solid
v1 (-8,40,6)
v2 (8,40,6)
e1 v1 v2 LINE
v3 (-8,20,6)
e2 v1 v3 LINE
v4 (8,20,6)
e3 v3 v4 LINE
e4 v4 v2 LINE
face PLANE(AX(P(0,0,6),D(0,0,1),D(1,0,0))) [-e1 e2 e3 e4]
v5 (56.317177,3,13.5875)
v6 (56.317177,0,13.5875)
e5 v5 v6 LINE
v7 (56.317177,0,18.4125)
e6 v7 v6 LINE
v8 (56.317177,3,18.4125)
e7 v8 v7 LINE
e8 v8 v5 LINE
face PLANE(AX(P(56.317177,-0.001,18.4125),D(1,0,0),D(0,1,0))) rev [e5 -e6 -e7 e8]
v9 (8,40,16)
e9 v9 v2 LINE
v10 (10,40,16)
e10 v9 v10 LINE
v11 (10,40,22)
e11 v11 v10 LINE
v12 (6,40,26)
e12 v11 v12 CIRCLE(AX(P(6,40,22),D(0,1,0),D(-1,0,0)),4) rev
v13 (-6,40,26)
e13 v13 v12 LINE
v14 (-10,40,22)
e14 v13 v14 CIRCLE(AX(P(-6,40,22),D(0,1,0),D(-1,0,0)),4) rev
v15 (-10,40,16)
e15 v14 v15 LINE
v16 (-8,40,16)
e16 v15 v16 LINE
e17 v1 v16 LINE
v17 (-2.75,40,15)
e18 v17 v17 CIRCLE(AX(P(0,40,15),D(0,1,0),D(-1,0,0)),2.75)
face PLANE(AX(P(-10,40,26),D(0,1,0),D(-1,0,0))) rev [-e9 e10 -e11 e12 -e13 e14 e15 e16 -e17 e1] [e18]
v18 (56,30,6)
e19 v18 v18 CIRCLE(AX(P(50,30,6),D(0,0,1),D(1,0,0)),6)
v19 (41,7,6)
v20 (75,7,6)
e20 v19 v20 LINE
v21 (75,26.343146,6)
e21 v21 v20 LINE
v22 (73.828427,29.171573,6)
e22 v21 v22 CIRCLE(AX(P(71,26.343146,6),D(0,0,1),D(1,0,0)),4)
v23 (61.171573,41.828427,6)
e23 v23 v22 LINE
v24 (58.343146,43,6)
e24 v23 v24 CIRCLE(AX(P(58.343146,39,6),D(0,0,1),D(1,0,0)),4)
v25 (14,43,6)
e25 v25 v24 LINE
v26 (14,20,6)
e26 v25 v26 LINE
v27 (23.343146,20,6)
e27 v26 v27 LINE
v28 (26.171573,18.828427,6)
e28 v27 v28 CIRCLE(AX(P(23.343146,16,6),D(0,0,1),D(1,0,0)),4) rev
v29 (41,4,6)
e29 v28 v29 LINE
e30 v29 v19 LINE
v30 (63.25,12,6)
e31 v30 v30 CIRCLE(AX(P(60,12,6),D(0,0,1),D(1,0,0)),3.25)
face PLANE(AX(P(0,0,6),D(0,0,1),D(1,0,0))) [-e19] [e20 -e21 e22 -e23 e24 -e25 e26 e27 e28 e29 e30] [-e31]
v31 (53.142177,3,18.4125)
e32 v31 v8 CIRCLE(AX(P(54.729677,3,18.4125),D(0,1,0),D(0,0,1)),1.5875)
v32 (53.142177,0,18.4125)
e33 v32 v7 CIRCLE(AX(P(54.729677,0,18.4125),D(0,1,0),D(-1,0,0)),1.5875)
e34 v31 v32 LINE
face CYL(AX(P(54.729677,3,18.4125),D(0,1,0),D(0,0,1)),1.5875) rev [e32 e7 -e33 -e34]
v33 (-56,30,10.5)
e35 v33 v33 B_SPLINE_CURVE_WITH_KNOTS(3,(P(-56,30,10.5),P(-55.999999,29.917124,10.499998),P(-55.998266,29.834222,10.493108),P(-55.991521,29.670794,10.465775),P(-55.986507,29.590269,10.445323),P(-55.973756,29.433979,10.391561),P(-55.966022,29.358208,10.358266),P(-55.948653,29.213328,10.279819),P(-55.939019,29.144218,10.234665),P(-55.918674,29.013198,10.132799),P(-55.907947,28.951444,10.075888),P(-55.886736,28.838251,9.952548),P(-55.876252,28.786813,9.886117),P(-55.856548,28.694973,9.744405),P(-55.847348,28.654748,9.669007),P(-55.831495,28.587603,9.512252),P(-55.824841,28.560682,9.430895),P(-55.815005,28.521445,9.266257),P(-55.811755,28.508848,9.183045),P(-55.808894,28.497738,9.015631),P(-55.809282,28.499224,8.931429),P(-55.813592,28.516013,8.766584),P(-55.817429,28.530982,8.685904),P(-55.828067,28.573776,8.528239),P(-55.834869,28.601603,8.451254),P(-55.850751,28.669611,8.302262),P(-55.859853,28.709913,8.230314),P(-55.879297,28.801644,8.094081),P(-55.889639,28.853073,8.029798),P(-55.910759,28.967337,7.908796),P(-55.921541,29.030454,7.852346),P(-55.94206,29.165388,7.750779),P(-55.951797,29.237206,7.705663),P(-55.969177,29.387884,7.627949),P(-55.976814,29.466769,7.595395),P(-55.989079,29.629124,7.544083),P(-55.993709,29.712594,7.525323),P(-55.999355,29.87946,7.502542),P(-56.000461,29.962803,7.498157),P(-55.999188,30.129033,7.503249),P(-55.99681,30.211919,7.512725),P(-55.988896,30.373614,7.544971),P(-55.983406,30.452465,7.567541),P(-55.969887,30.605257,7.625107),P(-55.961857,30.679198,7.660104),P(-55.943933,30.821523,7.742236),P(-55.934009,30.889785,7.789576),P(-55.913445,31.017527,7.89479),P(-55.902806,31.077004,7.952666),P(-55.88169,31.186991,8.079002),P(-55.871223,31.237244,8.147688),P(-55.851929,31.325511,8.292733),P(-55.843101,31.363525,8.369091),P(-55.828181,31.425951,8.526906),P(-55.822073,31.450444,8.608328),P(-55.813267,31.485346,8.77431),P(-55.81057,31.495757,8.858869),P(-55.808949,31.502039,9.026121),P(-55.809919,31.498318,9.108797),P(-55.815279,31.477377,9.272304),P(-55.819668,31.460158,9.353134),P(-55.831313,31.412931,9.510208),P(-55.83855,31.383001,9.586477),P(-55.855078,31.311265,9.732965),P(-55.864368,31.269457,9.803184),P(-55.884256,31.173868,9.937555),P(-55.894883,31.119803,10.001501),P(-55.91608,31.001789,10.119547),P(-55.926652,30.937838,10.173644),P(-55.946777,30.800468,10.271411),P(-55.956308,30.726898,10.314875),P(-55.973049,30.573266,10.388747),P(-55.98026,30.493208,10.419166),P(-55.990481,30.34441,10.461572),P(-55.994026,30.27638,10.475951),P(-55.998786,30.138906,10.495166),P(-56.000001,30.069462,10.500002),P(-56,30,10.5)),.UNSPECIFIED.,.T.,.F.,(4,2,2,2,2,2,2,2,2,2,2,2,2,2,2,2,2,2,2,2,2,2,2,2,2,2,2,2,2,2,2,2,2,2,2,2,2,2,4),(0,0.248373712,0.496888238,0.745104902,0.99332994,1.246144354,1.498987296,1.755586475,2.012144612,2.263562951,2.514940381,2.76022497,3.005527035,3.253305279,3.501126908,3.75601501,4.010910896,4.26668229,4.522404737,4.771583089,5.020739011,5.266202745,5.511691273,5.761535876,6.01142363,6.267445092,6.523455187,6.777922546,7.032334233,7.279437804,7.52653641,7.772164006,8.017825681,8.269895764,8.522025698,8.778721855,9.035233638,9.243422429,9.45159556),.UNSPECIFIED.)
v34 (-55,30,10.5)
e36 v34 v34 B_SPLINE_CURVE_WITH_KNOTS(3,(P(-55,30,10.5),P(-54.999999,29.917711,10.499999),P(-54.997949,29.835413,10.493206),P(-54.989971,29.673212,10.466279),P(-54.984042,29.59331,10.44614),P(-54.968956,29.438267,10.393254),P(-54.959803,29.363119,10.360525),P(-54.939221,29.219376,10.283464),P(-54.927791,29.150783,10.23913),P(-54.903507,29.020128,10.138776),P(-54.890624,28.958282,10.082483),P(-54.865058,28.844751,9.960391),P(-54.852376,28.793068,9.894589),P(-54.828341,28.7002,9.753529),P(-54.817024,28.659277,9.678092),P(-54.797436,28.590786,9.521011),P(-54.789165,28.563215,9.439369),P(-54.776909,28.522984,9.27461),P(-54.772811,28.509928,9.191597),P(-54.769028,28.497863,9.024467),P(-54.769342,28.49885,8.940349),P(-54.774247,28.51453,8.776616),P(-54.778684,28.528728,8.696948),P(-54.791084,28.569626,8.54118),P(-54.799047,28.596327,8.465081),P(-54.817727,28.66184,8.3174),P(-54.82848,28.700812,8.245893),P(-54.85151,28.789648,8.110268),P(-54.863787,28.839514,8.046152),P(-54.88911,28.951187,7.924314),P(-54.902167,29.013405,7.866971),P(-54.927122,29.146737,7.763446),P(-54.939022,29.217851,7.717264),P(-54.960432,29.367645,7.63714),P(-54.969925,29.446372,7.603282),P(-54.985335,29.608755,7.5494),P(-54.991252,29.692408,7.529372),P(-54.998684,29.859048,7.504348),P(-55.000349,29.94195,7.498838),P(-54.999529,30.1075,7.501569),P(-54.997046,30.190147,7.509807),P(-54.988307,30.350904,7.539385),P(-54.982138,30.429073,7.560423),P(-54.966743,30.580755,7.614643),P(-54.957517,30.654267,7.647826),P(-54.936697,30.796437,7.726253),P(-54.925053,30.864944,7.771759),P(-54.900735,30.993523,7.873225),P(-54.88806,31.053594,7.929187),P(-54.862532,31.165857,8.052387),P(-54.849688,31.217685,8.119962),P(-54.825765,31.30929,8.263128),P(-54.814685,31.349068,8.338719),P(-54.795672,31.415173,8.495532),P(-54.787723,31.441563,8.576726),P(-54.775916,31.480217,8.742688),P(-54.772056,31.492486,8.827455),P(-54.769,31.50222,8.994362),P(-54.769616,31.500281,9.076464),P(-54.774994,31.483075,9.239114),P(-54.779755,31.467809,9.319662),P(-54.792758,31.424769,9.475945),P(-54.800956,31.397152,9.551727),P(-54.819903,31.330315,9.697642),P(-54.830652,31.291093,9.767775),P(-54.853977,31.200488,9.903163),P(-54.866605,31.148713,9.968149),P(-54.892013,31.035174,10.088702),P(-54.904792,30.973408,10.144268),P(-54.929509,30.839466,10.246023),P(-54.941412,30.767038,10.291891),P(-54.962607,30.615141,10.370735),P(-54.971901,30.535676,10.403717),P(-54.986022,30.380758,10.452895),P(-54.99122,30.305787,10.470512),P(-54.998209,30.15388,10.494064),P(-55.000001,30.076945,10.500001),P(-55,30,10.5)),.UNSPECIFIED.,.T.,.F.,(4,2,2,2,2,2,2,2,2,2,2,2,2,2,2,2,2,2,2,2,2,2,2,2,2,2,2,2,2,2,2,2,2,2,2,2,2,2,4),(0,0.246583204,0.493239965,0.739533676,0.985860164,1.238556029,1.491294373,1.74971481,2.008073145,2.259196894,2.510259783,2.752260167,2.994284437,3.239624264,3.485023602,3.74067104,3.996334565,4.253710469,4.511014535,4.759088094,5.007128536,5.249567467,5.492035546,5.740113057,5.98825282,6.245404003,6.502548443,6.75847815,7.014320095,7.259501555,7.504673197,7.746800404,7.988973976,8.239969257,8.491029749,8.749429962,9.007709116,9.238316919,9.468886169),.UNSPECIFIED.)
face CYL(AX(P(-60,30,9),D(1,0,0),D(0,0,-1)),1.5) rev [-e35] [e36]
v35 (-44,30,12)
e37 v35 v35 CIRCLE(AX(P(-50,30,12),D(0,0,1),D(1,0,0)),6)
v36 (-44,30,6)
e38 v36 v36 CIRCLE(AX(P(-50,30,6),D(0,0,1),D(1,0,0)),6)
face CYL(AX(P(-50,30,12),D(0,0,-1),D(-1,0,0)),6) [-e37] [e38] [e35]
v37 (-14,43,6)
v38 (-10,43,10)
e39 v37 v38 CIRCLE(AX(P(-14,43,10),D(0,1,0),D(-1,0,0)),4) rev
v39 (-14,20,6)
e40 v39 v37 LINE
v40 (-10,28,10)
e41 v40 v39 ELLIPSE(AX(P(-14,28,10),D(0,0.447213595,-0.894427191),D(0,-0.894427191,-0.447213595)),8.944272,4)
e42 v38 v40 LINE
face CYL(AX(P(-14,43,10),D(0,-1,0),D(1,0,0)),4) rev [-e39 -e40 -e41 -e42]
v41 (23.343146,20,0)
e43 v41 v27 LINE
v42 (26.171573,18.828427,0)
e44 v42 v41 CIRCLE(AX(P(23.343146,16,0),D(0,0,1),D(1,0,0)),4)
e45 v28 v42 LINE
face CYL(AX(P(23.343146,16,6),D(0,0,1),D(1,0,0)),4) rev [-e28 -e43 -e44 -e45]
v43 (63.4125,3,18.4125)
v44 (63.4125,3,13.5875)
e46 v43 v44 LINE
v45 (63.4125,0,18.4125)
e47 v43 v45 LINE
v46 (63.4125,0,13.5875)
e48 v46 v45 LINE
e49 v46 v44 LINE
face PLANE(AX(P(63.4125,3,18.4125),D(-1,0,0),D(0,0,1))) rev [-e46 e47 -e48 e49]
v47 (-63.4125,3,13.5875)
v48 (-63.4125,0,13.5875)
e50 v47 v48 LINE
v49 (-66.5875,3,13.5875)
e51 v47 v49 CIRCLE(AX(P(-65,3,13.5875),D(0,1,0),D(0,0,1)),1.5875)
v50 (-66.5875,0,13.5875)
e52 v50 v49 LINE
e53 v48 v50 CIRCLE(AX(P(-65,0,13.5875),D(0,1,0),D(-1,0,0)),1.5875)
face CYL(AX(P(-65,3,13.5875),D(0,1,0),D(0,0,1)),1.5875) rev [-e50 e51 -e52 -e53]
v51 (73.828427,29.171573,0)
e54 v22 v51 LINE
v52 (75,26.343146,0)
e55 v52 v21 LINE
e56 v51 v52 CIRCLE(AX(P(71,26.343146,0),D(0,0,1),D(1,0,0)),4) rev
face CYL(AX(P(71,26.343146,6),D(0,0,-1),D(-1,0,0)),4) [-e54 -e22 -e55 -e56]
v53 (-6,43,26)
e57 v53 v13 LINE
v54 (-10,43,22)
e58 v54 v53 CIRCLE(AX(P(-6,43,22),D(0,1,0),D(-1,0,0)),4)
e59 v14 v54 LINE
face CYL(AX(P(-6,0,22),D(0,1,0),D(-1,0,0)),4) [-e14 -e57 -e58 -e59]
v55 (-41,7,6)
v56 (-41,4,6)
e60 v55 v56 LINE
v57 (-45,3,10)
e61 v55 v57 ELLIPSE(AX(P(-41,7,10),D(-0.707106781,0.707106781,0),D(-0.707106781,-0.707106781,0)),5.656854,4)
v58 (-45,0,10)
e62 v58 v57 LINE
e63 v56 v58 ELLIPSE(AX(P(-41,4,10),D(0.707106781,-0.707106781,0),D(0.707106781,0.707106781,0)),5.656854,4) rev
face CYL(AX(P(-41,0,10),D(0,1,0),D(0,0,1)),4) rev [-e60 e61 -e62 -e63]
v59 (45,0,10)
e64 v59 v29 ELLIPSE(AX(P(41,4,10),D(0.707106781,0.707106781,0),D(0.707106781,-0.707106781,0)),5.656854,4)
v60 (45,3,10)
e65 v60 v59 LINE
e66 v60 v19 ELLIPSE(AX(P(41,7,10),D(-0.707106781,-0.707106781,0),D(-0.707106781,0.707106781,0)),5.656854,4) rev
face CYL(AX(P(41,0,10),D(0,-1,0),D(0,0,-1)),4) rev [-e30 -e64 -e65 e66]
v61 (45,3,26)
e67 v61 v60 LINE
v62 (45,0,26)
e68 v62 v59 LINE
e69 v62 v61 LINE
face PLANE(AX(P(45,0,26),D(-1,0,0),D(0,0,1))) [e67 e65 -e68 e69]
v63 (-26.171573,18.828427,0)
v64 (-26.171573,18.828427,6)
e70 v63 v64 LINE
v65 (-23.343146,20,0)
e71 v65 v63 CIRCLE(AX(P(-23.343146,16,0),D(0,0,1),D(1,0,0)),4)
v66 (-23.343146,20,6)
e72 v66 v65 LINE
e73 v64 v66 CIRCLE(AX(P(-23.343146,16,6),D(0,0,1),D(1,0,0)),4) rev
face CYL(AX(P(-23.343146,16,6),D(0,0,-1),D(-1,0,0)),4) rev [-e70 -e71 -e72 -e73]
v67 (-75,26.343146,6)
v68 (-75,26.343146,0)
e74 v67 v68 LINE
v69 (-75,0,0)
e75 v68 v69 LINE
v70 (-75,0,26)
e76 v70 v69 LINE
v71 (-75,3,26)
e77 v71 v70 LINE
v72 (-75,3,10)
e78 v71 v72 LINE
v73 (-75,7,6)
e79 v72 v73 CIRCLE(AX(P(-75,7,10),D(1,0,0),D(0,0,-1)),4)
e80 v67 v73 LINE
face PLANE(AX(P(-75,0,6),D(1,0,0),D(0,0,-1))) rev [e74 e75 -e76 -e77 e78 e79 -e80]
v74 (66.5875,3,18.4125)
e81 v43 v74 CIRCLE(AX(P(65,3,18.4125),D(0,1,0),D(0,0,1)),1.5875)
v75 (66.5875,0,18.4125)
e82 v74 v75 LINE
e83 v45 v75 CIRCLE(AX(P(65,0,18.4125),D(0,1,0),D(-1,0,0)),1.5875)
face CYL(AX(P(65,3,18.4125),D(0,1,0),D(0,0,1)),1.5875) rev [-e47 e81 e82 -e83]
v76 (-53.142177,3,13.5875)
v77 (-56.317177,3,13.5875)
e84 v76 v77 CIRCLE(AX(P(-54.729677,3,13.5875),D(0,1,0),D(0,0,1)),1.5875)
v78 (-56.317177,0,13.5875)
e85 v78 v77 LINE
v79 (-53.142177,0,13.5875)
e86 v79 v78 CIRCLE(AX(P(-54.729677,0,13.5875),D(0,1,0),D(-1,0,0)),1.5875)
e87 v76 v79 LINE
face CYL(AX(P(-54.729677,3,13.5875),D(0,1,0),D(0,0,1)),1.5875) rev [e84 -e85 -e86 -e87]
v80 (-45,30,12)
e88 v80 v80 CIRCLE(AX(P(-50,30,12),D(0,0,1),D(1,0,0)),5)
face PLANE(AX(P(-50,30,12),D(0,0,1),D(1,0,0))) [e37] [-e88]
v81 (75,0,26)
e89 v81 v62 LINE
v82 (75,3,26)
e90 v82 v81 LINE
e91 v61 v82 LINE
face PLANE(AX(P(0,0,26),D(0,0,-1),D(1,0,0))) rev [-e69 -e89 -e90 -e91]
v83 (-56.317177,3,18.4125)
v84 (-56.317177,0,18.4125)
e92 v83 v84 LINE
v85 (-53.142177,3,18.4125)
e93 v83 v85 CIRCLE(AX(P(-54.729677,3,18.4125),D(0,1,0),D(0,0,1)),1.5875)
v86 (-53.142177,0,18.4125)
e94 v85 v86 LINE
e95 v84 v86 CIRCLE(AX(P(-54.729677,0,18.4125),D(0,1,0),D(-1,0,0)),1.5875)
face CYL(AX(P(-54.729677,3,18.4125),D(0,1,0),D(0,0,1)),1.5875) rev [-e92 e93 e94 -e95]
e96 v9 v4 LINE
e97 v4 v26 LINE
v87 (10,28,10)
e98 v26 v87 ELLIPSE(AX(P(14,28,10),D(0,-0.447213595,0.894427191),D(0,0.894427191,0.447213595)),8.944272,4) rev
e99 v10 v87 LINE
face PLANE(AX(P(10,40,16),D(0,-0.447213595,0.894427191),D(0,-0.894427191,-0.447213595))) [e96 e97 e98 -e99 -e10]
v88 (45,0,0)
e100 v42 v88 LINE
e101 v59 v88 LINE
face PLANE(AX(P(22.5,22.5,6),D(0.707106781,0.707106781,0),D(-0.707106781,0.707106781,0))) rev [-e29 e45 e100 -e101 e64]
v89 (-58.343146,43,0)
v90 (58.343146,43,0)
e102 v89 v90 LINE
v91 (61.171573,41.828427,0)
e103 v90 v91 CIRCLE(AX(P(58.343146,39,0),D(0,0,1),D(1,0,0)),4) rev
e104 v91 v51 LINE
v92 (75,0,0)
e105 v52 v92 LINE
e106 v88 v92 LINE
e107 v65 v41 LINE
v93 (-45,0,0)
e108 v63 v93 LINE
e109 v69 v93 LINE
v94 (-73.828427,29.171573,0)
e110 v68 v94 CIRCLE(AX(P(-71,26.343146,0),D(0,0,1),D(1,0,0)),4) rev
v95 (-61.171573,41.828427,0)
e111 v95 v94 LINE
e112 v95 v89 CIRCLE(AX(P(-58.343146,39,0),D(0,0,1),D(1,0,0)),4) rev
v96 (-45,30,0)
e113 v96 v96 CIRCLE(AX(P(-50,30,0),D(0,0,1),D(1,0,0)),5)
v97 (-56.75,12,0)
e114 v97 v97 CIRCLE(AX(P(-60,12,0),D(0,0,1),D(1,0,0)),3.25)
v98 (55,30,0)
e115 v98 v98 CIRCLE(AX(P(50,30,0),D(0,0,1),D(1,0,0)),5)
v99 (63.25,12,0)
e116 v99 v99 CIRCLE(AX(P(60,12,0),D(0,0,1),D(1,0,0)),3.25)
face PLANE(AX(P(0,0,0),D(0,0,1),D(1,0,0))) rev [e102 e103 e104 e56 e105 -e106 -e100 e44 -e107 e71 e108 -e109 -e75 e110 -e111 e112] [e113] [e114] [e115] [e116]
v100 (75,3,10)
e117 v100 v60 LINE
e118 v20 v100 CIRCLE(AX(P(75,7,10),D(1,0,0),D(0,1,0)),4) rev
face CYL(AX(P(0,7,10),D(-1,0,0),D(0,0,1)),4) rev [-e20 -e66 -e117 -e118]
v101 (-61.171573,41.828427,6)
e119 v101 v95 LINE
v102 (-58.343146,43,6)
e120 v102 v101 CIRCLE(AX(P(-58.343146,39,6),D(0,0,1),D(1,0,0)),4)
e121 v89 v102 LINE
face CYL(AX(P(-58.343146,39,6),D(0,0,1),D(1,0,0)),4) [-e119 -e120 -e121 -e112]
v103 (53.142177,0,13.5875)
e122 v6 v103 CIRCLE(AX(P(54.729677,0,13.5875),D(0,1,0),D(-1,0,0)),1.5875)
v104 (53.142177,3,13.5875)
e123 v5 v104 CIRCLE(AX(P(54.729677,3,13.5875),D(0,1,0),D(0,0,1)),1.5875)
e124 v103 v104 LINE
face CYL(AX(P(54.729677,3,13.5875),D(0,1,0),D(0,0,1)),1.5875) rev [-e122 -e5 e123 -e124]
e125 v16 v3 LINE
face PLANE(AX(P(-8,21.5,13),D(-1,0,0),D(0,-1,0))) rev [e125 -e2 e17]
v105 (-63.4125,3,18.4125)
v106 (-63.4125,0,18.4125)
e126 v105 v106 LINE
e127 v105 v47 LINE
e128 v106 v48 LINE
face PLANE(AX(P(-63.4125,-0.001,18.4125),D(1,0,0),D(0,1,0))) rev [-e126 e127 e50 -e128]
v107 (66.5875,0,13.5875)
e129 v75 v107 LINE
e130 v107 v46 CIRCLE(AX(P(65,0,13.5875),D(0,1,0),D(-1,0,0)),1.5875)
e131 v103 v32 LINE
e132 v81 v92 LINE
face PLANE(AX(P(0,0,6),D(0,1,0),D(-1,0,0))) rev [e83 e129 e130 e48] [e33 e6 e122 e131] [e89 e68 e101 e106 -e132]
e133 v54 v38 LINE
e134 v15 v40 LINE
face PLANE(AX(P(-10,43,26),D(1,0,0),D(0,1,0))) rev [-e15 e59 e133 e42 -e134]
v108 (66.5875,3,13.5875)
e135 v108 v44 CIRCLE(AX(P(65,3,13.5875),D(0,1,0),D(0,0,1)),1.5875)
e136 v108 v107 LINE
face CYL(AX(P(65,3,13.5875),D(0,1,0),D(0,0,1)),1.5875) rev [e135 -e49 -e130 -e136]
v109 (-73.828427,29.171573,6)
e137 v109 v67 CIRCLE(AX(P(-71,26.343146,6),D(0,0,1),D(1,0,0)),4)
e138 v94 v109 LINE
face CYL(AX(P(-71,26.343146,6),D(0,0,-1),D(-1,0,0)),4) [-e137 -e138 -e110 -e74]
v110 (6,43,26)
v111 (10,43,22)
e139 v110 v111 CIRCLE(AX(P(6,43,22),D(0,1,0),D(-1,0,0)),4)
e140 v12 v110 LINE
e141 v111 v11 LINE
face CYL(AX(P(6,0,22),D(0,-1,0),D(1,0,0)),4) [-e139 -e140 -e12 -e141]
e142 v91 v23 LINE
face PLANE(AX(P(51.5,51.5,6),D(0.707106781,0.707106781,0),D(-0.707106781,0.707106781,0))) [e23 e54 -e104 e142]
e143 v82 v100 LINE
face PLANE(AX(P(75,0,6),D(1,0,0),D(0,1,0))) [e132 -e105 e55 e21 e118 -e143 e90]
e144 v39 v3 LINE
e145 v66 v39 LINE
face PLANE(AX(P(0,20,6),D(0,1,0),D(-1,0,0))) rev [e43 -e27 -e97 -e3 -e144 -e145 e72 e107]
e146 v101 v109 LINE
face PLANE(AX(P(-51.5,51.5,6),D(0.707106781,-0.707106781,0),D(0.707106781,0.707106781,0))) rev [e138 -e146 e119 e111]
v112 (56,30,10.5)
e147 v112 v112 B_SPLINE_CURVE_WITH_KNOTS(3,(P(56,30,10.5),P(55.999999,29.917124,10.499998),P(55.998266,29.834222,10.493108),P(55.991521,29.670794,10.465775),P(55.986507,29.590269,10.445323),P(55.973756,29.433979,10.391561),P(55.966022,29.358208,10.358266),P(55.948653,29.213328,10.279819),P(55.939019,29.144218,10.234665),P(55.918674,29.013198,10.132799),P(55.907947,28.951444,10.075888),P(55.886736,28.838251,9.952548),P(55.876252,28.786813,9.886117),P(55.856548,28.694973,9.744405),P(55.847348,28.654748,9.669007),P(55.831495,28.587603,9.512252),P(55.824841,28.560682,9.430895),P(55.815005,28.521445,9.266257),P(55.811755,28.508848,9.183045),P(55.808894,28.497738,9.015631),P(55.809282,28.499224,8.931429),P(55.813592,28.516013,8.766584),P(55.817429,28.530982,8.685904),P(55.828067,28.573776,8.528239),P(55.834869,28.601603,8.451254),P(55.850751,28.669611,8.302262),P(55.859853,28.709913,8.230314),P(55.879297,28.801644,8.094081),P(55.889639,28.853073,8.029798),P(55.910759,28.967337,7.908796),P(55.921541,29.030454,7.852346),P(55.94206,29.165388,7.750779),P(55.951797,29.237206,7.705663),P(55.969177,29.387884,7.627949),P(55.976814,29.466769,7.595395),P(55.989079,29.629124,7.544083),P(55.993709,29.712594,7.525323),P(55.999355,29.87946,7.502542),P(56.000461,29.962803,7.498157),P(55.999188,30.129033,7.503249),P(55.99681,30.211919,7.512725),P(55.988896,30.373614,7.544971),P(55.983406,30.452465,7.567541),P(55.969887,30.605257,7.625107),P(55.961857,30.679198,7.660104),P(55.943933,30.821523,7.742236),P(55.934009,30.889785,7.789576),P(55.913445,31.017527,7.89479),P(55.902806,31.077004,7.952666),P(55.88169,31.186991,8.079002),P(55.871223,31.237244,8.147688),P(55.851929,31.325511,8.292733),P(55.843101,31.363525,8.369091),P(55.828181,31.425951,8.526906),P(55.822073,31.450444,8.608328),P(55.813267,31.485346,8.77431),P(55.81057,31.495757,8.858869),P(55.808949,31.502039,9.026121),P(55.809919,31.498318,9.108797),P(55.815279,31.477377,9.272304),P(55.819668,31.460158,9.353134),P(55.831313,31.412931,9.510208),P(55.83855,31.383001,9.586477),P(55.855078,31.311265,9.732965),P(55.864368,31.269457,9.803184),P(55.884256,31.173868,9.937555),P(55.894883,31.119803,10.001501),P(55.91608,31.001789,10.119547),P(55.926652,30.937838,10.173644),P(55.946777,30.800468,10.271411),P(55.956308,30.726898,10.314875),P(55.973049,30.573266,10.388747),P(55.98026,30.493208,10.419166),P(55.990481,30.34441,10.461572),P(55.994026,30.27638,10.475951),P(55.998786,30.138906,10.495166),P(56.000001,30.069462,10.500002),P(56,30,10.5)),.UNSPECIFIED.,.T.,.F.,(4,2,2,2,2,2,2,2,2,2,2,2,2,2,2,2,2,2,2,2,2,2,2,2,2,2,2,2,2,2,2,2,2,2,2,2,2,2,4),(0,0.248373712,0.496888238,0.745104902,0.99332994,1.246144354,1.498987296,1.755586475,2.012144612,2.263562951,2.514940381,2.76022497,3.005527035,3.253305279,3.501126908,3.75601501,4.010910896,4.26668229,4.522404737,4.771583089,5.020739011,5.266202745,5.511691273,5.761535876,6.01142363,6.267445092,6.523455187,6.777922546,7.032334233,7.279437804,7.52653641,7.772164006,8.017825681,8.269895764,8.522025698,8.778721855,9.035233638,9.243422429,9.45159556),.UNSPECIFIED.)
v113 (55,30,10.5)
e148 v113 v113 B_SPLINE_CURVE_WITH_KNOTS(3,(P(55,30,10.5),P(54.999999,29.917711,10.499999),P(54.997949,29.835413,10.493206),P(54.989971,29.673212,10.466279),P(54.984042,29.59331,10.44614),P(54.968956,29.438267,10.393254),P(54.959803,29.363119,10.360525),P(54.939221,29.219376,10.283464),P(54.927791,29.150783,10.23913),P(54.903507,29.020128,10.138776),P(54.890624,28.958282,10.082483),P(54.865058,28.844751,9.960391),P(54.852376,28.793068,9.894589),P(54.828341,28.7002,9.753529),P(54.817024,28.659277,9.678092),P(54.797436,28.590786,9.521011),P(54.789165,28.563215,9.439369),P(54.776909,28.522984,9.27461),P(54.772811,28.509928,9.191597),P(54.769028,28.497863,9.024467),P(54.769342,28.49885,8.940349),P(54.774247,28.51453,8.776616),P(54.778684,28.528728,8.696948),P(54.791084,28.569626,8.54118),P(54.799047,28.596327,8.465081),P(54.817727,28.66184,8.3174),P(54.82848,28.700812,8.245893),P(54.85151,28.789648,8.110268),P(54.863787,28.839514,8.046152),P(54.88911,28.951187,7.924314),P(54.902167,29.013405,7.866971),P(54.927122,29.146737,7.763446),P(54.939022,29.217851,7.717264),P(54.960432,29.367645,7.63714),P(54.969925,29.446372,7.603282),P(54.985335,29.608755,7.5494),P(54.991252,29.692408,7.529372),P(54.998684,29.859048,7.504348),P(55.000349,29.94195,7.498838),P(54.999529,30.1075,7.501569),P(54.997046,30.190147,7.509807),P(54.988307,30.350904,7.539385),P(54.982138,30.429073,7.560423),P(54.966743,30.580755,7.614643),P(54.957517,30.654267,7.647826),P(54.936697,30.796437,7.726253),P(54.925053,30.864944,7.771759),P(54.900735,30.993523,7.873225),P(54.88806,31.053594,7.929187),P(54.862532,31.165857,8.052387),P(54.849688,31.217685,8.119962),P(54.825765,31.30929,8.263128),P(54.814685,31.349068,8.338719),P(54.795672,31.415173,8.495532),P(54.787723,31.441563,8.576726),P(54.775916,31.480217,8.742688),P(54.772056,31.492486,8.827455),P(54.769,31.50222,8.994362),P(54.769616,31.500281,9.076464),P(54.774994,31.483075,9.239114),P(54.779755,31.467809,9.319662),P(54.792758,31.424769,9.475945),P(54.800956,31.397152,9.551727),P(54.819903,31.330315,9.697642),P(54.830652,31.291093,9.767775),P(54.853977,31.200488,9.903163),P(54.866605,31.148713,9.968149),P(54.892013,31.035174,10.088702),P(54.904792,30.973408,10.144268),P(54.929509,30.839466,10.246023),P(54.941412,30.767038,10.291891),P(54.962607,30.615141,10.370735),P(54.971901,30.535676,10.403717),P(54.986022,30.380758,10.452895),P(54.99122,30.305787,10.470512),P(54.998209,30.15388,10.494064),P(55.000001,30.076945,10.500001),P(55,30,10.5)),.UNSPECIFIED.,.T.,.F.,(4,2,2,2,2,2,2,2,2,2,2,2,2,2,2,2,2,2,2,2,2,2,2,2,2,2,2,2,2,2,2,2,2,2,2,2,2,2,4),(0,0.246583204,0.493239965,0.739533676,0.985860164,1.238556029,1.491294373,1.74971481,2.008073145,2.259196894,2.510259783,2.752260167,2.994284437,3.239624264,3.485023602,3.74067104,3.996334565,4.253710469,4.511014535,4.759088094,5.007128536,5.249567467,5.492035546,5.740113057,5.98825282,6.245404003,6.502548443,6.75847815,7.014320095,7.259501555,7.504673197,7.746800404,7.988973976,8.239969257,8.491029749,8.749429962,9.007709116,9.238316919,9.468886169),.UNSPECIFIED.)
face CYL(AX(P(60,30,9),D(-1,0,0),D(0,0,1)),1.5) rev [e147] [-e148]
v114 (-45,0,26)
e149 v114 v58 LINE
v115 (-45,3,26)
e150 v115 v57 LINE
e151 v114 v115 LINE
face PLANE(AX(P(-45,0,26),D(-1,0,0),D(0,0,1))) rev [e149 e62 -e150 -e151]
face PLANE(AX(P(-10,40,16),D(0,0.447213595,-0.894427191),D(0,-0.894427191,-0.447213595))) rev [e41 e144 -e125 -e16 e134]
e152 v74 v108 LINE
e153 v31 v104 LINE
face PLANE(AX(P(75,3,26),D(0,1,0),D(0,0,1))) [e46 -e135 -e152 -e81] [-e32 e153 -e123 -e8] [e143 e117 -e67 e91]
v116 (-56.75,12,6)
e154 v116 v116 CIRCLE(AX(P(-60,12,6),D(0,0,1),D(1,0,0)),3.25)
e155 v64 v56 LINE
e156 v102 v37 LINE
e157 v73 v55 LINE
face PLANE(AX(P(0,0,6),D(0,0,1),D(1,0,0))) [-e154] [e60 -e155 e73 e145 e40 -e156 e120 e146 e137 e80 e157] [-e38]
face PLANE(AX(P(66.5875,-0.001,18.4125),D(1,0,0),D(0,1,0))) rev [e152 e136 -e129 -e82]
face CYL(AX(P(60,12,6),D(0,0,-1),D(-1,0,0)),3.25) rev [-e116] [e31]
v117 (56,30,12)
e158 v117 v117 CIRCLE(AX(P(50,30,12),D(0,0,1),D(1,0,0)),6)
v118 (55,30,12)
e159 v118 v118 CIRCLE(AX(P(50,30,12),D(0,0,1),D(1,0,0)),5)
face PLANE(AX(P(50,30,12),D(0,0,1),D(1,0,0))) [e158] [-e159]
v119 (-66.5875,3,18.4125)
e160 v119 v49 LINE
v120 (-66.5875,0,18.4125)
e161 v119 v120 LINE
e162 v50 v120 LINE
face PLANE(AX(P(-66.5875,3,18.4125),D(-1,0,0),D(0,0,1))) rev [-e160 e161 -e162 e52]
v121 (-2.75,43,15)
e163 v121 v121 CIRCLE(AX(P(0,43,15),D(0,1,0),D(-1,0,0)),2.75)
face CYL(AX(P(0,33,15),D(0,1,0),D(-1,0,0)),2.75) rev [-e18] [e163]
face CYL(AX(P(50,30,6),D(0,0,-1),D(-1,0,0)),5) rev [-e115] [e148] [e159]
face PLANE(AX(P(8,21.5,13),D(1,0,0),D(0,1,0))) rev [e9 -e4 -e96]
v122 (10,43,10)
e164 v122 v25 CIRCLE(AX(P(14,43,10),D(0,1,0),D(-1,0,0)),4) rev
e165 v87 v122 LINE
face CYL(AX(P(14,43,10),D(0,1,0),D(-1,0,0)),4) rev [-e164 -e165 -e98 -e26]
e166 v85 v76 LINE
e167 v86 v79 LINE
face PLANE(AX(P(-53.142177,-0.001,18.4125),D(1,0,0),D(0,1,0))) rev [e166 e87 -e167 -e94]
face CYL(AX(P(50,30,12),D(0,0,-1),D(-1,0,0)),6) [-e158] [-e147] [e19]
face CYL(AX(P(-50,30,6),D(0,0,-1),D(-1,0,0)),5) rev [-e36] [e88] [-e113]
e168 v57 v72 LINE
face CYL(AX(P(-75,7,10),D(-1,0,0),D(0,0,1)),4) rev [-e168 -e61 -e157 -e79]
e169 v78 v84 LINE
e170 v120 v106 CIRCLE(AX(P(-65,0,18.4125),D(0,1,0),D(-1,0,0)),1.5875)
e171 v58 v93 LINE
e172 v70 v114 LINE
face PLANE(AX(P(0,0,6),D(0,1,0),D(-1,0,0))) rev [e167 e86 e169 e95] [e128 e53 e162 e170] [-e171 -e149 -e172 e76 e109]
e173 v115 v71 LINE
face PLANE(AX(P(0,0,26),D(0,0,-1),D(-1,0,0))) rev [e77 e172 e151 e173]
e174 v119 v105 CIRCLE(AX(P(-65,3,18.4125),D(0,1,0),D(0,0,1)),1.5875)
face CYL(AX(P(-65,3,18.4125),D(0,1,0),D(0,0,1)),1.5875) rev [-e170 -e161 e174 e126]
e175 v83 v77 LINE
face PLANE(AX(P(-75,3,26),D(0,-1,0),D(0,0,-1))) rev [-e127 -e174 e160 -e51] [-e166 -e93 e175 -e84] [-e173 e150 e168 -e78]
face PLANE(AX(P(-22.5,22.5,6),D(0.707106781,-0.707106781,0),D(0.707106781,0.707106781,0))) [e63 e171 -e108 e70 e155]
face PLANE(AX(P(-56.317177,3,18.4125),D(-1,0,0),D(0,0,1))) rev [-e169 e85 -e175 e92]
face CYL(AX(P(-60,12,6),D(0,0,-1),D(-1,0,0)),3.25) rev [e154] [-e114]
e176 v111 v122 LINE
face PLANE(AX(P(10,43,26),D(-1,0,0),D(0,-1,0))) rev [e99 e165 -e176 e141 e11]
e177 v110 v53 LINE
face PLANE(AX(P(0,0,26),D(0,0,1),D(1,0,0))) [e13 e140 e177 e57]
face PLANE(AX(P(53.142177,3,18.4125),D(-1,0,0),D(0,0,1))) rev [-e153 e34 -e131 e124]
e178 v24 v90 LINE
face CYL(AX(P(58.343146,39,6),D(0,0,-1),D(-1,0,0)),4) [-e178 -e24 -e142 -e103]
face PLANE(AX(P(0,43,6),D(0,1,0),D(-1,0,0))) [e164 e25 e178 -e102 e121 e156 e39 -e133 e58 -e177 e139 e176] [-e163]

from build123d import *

# Parameters (mm, degrees)
CROQUIS1_R                            = 3.25
CROQUIS1_R_2                          = 5
SALIENTE_EXTRUIR1_DEPTH               = 6
CROQUIS2_R                            = 6
CROQUIS2_R_2                          = 5
SALIENTE_EXTRUIR2_DEPTH               = 6
CROQUIS4_W                            = 20
CROQUIS4_H                            = 3
SALIENTE_EXTRUIR3_DEPTH               = 20
CROQUIS11_R                           = 2.75
CORTAR_EXTRUIR2_DEPTH                 = 10
NERVIO2_REACH                         = 100.742
CROQUIS7_WALL_W                       = 221.844856356
CROQUIS7_WALL_H                       = 2
CROQUIS8_W                            = 30
CROQUIS8_H                            = 3
SALIENTE_EXTRUIR4_DEPTH               = 20
DI_METRO_DE_TALADRO_1_8_0_125_2_DEPTH = 3
CROQUIS12_R                           = 1.5
CORTAR_EXTRUIR3_DEPTH                 = 10
REDONDEO1_R                           = 4


# Read off the part's stored shape, not the designer's step: Diámetro de taladro 1/8 (0.125)2
with BuildPart() as part:
    # Croquis1 → Saliente-Extruir1 (new body)
    with BuildSketch(Plane.XY):
        Polygon((60, 43), (-60, 43), (-75, 28), (-75, 0), (-45, 0), (-25, 20), (25, 20), (45, 0), (75, 0), (75, 28), align=None)
        with Locations((-60, 12)):
            Circle(CROQUIS1_R, mode=Mode.SUBTRACT)
        with Locations((60, 12)):
            Circle(CROQUIS1_R, mode=Mode.SUBTRACT)
        with Locations((-50, 30)):
            Circle(CROQUIS1_R_2, mode=Mode.SUBTRACT)
        with Locations((50, 30)):
            Circle(CROQUIS1_R_2, mode=Mode.SUBTRACT)
    extrude(amount=SALIENTE_EXTRUIR1_DEPTH)

    # Croquis2 → Saliente-Extruir2 (add)
    # profile 1 of 2: a face of its own
    with BuildSketch(Plane.XY.offset(6)):
        with Locations((-50, 30)):
            Circle(CROQUIS2_R)
        with Locations((-50, 30)):
            Circle(CROQUIS2_R_2, mode=Mode.SUBTRACT)
    # profile 2 of 2: a face of its own
    with BuildSketch(Plane.XY.offset(6)):
        with Locations((50, 30)):
            Circle(CROQUIS2_R)
        with Locations((50, 30)):
            Circle(CROQUIS2_R_2, mode=Mode.SUBTRACT)
    extrude(amount=SALIENTE_EXTRUIR2_DEPTH)

    # Croquis4 → Saliente-Extruir3 (add)
    with BuildSketch(Plane.XY.offset(6)):
        with Locations((0, 41.5)):
            Rectangle(CROQUIS4_W, CROQUIS4_H)
    extrude(amount=SALIENTE_EXTRUIR3_DEPTH)

    # Croquis11 → Cortar-Extruir2 (cut)
    with BuildSketch(Plane(origin=(0, 43, 0), x_dir=(1, 0, 0), z_dir=(0, 1, 0))):
        with Locations(Location((0, -15, 0), (0, 0, 180))):
            Circle(CROQUIS11_R)
    extrude(amount=-CORTAR_EXTRUIR2_DEPTH, mode=Mode.SUBTRACT)

    # Croquis7 wall → Nervio2 (add, up to next)
    with BuildSketch(Plane(origin=(-10, 30, 11), x_dir=(0, -0.894427191, -0.4472135955), z_dir=(0, -0.4472135955, 0.894427191)), mode=Mode.PRIVATE) as nervio2_sk1:
        with Locations((0, 1)):
            Rectangle(CROQUIS7_WALL_W, CROQUIS7_WALL_H)
    nervio2_tool1 = extrude(nervio2_sk1.sketch, amount=-NERVIO2_REACH, mode=Mode.PRIVATE) - part.part
    nervio2 = nervio2_tool1.solids().sort_by_distance((-10, 30, 11))[0]
    add(nervio2)

    # Croquis8 → Saliente-Extruir4 (add)
    with BuildSketch(Plane.XY.offset(6)):
        with Locations((-60, 1.5)):
            Rectangle(CROQUIS8_W, CROQUIS8_H)
    saliente_extruir4 = extrude(amount=SALIENTE_EXTRUIR4_DEPTH)

    # Diámetro de taladro 1/8 (0.125)2 outline → Diámetro de taladro 1/8 (0.125)2 (cut)
    with BuildSketch(Plane(origin=(0, 0, 0), x_dir=(1, 0, 0), z_dir=(0, 1, 0))):
        with BuildLine():
            Line((-53.142177149, -18.4125), (-53.142177149, -13.5875))
            ThreePointArc((-53.142177149, -13.5875), (-54.729677149, -12), (-56.317177149, -13.5875))
            Line((-56.317177149, -13.5875), (-56.317177149, -18.4125))
            ThreePointArc((-56.317177149, -18.4125), (-54.729677149, -20), (-53.142177149, -18.4125))
        make_face()
        with BuildLine():
            Line((-63.4125, -18.4125), (-63.4125, -13.5875))
            ThreePointArc((-63.4125, -13.5875), (-65, -12), (-66.5875, -13.5875))
            Line((-66.5875, -13.5875), (-66.5875, -18.4125))
            ThreePointArc((-66.5875, -18.4125), (-65, -20), (-63.4125, -18.4125))
        make_face()
    di_metro_de_taladro_1_8_0_125_2 = extrude(amount=DI_METRO_DE_TALADRO_1_8_0_125_2_DEPTH, mode=Mode.SUBTRACT)

    # Croquis12 → Cortar-Extruir3 (cut)
    with BuildSketch(Plane(origin=(-50, 0, 0), x_dir=(0, 0, -1), z_dir=(1, 0, 0))):
        with Locations(Location((-9, 30, 0), (0, 0, 180))):
            Circle(CROQUIS12_R)
    cortar_extruir3 = extrude(amount=-CORTAR_EXTRUIR3_DEPTH, mode=Mode.SUBTRACT)

    # Simetría2: Nervio2, Saliente-Extruir4, Diámetro de taladro 1/8 (0.125)2, Cortar-Extruir3 across plane
    add(nervio2.mirror(Plane(origin=(0, 0, 0), x_dir=(0, 0, 1), z_dir=(1, 0, 0))))
    add(saliente_extruir4.mirror(Plane(origin=(0, 0, 0), x_dir=(0, 0, 1), z_dir=(1, 0, 0))))
    add(di_metro_de_taladro_1_8_0_125_2.mirror(Plane(origin=(0, 0, 0), x_dir=(0, 0, 1), z_dir=(1, 0, 0))), mode=Mode.SUBTRACT)
    add(cortar_extruir3.mirror(Plane(origin=(0, 0, 0), x_dir=(0, 0, 1), z_dir=(1, 0, 0))), mode=Mode.SUBTRACT)

    # Redondeo1
    # the kernel refuses this fillet: 4 mm, written as the material it adds along each edge
    with BuildSketch(Plane(origin=(-45, 3, 6), x_dir=(0, 1, 0), z_dir=(-1, 0, 0))) as redondeo1_piece_1:
        with BuildLine():
            CenterArc((REDONDEO1_R, -REDONDEO1_R), REDONDEO1_R, 90, 90)
            Line((0, -REDONDEO1_R), (0, 0))
            Line((0, 0), (REDONDEO1_R, 0))
        make_face()
    extrude(amount=30)
    with BuildSketch(Plane(origin=(45, 0, 6), x_dir=(-1, 0, 0), z_dir=(0, 1, 0))) as redondeo1_piece_2_section:
        with BuildLine():
            CenterArc((REDONDEO1_R, REDONDEO1_R), REDONDEO1_R, 180, 90)
            Line((0, REDONDEO1_R), (0, 0))
            Line((0, 0), (REDONDEO1_R, 0))
        make_face()
    redondeo1_piece_2 = extrude(amount=3, mode=Mode.PRIVATE)
    redondeo1_piece_2 = split(redondeo1_piece_2, bisect_by=Plane(origin=(43.821771507, 1.178228493, 7.107331066), z_dir=(0.7071067811865477, 0.7071067811865474, 0)), keep=Keep.TOP, mode=Mode.PRIVATE)
    add(redondeo1_piece_2)
    with BuildSketch(Plane(origin=(45, 3, 6), x_dir=(0, 1, 0), z_dir=(1, 0, 0))) as redondeo1_piece_3:
        with BuildLine():
            CenterArc((REDONDEO1_R, REDONDEO1_R), REDONDEO1_R, 180, 90)
            Line((0, REDONDEO1_R), (0, 0))
            Line((0, 0), (REDONDEO1_R, 0))
        make_face()
    extrude(amount=30)
    with BuildSketch(Plane(origin=(-25, 20, 0), x_dir=(-0.7071067811865421, -0.7071067811865528, 0), z_dir=(0, 0, 1)), Plane(origin=(25, 20, 0), x_dir=(-1, 0, 0), z_dir=(0, 0, 1))) as redondeo1_piece_4:
        with BuildLine():
            CenterArc((REDONDEO1_R * 0.414213562373, REDONDEO1_R), REDONDEO1_R, 225, 45)
            Line((-REDONDEO1_R * 0.292893218813, REDONDEO1_R * 0.292893218813), (0, 0))
            Line((0, 0), (REDONDEO1_R * 0.414213562373, 0))
        make_face()
    extrude(amount=6)
    with BuildSketch(Plane(origin=(-10, 20, 6), x_dir=(-1, 0, 0), z_dir=(0, 1, 0))) as redondeo1_piece_5_section:
        with BuildLine():
            CenterArc((REDONDEO1_R, REDONDEO1_R), REDONDEO1_R, 180, 90)
            Line((0, REDONDEO1_R), (0, 0))
            Line((0, 0), (REDONDEO1_R, 0))
        make_face()
    redondeo1_piece_5 = extrude(amount=23, mode=Mode.PRIVATE)
    redondeo1_piece_5 = split(redondeo1_piece_5, bisect_by=Plane(origin=(-10.946740329, 30.205569968, 11.102784984), z_dir=(0, 0.447213595499958, -0.894427190999916)), keep=Keep.TOP, mode=Mode.PRIVATE)
    add(redondeo1_piece_5)
    with BuildSketch(Plane(origin=(10, 43, 6), x_dir=(1, 0, 0), z_dir=(0, -1, 0))) as redondeo1_piece_6_section:
        with BuildLine():
            CenterArc((REDONDEO1_R, REDONDEO1_R), REDONDEO1_R, 180, 90)
            Line((0, REDONDEO1_R), (0, 0))
            Line((0, 0), (REDONDEO1_R, 0))
        make_face()
    redondeo1_piece_6 = extrude(amount=23, mode=Mode.PRIVATE)
    redondeo1_piece_6 = split(redondeo1_piece_6, bisect_by=Plane(origin=(10.946740329, 30.205569968, 11.102784984), z_dir=(0, 0.447213595499958, -0.894427190999916)), keep=Keep.TOP, mode=Mode.PRIVATE)
    add(redondeo1_piece_6)
    with BuildSketch(Plane(origin=(-45, 0, 6), x_dir=(1, 0, 0), z_dir=(0, 1, 0))) as redondeo1_piece_7_section:
        with BuildLine():
            CenterArc((REDONDEO1_R, -REDONDEO1_R), REDONDEO1_R, 90, 90)
            Line((0, -REDONDEO1_R), (0, 0))
            Line((0, 0), (REDONDEO1_R, 0))
        make_face()
    redondeo1_piece_7 = extrude(amount=3, mode=Mode.PRIVATE)
    redondeo1_piece_7 = split(redondeo1_piece_7, bisect_by=Plane(origin=(-43.821771507, 1.178228493, 7.107331066), z_dir=(-0.7071067811865537, 0.7071067811865415, 0)), keep=Keep.TOP, mode=Mode.PRIVATE)
    add(redondeo1_piece_7)
    with BuildSketch(Plane(origin=(-45, 0, 6), x_dir=(1, 0, 0), z_dir=(0, 1, 0))) as redondeo1_piece_8a_section:
        with BuildLine():
            CenterArc((REDONDEO1_R, -REDONDEO1_R), REDONDEO1_R, 90, 90)
            Line((0, -REDONDEO1_R), (0, 0))
            Line((0, 0), (REDONDEO1_R, 0))
        make_face()
    redondeo1_piece_8a = extrude(amount=13, mode=Mode.PRIVATE)
    redondeo1_piece_8a = split(redondeo1_piece_8a, bisect_by=Plane(origin=(-40.545977817, 4.454022183, 6.906735099), z_dir=(-0.7071067811865537, 0.7071067811865415, 0)), keep=Keep.TOP, mode=Mode.PRIVATE)
    redondeo1_piece_8a = split(redondeo1_piece_8a, bisect_by=Plane(origin=(-44.097771326, 3, 6.906735099), z_dir=(0, 1, 0)), keep=Keep.TOP, mode=Mode.PRIVATE)
    with BuildSketch(Plane(origin=(-35, 3, 6), x_dir=(0, 1, 0), z_dir=(-1, 0, 0))) as redondeo1_piece_8b_section:
        with BuildLine():
            CenterArc((REDONDEO1_R, -REDONDEO1_R), REDONDEO1_R, 90, 90)
            Line((0, -REDONDEO1_R), (0, 0))
            Line((0, 0), (REDONDEO1_R, 0))
        make_face()
    redondeo1_piece_8b = extrude(amount=40, mode=Mode.PRIVATE)
    redondeo1_piece_8b = split(redondeo1_piece_8b, bisect_by=Plane(origin=(-41.928013954, 3.071986046, 6.793098492), z_dir=(-0.7071067811865537, 0.7071067811865415, 0)), keep=Keep.TOP, mode=Mode.PRIVATE)
    redondeo1_piece_8b = split(redondeo1_piece_8b, bisect_by=Plane(origin=(-45, 4.095981395, 6.793098492), z_dir=(1, 0, 0)), keep=Keep.TOP, mode=Mode.PRIVATE)
    redondeo1_piece_8 = redondeo1_piece_8a & redondeo1_piece_8b
    add(redondeo1_piece_8)
    with BuildSketch(Plane(origin=(35, 3, 6), x_dir=(0, 1, 0), z_dir=(1, 0, 0))) as redondeo1_piece_9a_section:
        with BuildLine():
            CenterArc((REDONDEO1_R, REDONDEO1_R), REDONDEO1_R, 180, 90)
            Line((0, REDONDEO1_R), (0, 0))
            Line((0, 0), (REDONDEO1_R, 0))
        make_face()
    redondeo1_piece_9a = extrude(amount=40, mode=Mode.PRIVATE)
    redondeo1_piece_9a = split(redondeo1_piece_9a, bisect_by=Plane(origin=(41.928013954, 3.071986046, 6.793098492), z_dir=(0.7071067811865477, 0.7071067811865474, 0)), keep=Keep.TOP, mode=Mode.PRIVATE)
    redondeo1_piece_9a = split(redondeo1_piece_9a, bisect_by=Plane(origin=(45, 4.095981395, 6.793098492), z_dir=(-1, 0, 0)), keep=Keep.TOP, mode=Mode.PRIVATE)
    with BuildSketch(Plane(origin=(45, 0, 6), x_dir=(-1, 0, 0), z_dir=(0, 1, 0))) as redondeo1_piece_9b_section:
        with BuildLine():
            CenterArc((REDONDEO1_R, REDONDEO1_R), REDONDEO1_R, 180, 90)
            Line((0, REDONDEO1_R), (0, 0))
            Line((0, 0), (REDONDEO1_R, 0))
        make_face()
    redondeo1_piece_9b = extrude(amount=13, mode=Mode.PRIVATE)
    redondeo1_piece_9b = split(redondeo1_piece_9b, bisect_by=Plane(origin=(40.545977817, 4.454022183, 6.906735099), z_dir=(0.7071067811865477, 0.7071067811865474, 0)), keep=Keep.TOP, mode=Mode.PRIVATE)
    redondeo1_piece_9b = split(redondeo1_piece_9b, bisect_by=Plane(origin=(44.097771326, 3, 6.906735099), z_dir=(0, 1, 0)), keep=Keep.TOP, mode=Mode.PRIVATE)
    redondeo1_piece_9 = redondeo1_piece_9a & redondeo1_piece_9b
    add(redondeo1_piece_9)
    # the kernel refuses this fillet: 4 mm, written as the material it takes off along each edge
    with BuildSketch(Plane(origin=(-75, 28, -4.142135624), x_dir=(0, -1, 0), z_dir=(0, 0, 1)), Plane(origin=(60, 43, -4.142135624), x_dir=(-1, 0, 0), z_dir=(0, 0, 1))) as redondeo1_2_piece_1:
        with BuildLine():
            CenterArc((REDONDEO1_R * 0.414213562373, REDONDEO1_R), REDONDEO1_R, 225, 45)
            Line((-REDONDEO1_R * 0.292893218813, REDONDEO1_R * 0.292893218813), (0, 0))
            Line((0, 0), (REDONDEO1_R * 0.414213562373, 0))
        make_face()
    extrude(amount=14.284271247, mode=Mode.SUBTRACT)
    with BuildSketch(Plane(origin=(-60, 43, -4.142135624), x_dir=(1, 0, 0), z_dir=(0, 0, 1)), Plane(origin=(75, 28, -4.142135624), x_dir=(0, -1, 0), z_dir=(0, 0, 1))) as redondeo1_2_piece_2:
        with BuildLine():
            CenterArc((REDONDEO1_R * 0.414213562373, -REDONDEO1_R), REDONDEO1_R, 90, 45)
            Line((-REDONDEO1_R * 0.292893218813, -REDONDEO1_R * 0.292893218813), (0, 0))
            Line((0, 0), (REDONDEO1_R * 0.414213562373, 0))
        make_face()
    extrude(amount=14.284271247, mode=Mode.SUBTRACT)
    with BuildSketch(Plane(origin=(-10, 30, 26), x_dir=(0, 0, -1), z_dir=(0, 1, 0))) as redondeo1_2_piece_3:
        with BuildLine():
            CenterArc((REDONDEO1_R, -REDONDEO1_R), REDONDEO1_R, 90, 90)
            Line((0, -REDONDEO1_R), (0, 0))
            Line((0, 0), (REDONDEO1_R, 0))
        make_face()
    extrude(amount=23, mode=Mode.SUBTRACT)
    with BuildSketch(Plane(origin=(10, 53, 26), x_dir=(-1, 0, 0), z_dir=(0, -1, 0))) as redondeo1_2_piece_4:
        with BuildLine():
            CenterArc((REDONDEO1_R, REDONDEO1_R), REDONDEO1_R, 180, 90)
            Line((0, REDONDEO1_R), (0, 0))
            Line((0, 0), (REDONDEO1_R, 0))
        make_face()
    extrude(amount=23, mode=Mode.SUBTRACT)


solid = part.part
